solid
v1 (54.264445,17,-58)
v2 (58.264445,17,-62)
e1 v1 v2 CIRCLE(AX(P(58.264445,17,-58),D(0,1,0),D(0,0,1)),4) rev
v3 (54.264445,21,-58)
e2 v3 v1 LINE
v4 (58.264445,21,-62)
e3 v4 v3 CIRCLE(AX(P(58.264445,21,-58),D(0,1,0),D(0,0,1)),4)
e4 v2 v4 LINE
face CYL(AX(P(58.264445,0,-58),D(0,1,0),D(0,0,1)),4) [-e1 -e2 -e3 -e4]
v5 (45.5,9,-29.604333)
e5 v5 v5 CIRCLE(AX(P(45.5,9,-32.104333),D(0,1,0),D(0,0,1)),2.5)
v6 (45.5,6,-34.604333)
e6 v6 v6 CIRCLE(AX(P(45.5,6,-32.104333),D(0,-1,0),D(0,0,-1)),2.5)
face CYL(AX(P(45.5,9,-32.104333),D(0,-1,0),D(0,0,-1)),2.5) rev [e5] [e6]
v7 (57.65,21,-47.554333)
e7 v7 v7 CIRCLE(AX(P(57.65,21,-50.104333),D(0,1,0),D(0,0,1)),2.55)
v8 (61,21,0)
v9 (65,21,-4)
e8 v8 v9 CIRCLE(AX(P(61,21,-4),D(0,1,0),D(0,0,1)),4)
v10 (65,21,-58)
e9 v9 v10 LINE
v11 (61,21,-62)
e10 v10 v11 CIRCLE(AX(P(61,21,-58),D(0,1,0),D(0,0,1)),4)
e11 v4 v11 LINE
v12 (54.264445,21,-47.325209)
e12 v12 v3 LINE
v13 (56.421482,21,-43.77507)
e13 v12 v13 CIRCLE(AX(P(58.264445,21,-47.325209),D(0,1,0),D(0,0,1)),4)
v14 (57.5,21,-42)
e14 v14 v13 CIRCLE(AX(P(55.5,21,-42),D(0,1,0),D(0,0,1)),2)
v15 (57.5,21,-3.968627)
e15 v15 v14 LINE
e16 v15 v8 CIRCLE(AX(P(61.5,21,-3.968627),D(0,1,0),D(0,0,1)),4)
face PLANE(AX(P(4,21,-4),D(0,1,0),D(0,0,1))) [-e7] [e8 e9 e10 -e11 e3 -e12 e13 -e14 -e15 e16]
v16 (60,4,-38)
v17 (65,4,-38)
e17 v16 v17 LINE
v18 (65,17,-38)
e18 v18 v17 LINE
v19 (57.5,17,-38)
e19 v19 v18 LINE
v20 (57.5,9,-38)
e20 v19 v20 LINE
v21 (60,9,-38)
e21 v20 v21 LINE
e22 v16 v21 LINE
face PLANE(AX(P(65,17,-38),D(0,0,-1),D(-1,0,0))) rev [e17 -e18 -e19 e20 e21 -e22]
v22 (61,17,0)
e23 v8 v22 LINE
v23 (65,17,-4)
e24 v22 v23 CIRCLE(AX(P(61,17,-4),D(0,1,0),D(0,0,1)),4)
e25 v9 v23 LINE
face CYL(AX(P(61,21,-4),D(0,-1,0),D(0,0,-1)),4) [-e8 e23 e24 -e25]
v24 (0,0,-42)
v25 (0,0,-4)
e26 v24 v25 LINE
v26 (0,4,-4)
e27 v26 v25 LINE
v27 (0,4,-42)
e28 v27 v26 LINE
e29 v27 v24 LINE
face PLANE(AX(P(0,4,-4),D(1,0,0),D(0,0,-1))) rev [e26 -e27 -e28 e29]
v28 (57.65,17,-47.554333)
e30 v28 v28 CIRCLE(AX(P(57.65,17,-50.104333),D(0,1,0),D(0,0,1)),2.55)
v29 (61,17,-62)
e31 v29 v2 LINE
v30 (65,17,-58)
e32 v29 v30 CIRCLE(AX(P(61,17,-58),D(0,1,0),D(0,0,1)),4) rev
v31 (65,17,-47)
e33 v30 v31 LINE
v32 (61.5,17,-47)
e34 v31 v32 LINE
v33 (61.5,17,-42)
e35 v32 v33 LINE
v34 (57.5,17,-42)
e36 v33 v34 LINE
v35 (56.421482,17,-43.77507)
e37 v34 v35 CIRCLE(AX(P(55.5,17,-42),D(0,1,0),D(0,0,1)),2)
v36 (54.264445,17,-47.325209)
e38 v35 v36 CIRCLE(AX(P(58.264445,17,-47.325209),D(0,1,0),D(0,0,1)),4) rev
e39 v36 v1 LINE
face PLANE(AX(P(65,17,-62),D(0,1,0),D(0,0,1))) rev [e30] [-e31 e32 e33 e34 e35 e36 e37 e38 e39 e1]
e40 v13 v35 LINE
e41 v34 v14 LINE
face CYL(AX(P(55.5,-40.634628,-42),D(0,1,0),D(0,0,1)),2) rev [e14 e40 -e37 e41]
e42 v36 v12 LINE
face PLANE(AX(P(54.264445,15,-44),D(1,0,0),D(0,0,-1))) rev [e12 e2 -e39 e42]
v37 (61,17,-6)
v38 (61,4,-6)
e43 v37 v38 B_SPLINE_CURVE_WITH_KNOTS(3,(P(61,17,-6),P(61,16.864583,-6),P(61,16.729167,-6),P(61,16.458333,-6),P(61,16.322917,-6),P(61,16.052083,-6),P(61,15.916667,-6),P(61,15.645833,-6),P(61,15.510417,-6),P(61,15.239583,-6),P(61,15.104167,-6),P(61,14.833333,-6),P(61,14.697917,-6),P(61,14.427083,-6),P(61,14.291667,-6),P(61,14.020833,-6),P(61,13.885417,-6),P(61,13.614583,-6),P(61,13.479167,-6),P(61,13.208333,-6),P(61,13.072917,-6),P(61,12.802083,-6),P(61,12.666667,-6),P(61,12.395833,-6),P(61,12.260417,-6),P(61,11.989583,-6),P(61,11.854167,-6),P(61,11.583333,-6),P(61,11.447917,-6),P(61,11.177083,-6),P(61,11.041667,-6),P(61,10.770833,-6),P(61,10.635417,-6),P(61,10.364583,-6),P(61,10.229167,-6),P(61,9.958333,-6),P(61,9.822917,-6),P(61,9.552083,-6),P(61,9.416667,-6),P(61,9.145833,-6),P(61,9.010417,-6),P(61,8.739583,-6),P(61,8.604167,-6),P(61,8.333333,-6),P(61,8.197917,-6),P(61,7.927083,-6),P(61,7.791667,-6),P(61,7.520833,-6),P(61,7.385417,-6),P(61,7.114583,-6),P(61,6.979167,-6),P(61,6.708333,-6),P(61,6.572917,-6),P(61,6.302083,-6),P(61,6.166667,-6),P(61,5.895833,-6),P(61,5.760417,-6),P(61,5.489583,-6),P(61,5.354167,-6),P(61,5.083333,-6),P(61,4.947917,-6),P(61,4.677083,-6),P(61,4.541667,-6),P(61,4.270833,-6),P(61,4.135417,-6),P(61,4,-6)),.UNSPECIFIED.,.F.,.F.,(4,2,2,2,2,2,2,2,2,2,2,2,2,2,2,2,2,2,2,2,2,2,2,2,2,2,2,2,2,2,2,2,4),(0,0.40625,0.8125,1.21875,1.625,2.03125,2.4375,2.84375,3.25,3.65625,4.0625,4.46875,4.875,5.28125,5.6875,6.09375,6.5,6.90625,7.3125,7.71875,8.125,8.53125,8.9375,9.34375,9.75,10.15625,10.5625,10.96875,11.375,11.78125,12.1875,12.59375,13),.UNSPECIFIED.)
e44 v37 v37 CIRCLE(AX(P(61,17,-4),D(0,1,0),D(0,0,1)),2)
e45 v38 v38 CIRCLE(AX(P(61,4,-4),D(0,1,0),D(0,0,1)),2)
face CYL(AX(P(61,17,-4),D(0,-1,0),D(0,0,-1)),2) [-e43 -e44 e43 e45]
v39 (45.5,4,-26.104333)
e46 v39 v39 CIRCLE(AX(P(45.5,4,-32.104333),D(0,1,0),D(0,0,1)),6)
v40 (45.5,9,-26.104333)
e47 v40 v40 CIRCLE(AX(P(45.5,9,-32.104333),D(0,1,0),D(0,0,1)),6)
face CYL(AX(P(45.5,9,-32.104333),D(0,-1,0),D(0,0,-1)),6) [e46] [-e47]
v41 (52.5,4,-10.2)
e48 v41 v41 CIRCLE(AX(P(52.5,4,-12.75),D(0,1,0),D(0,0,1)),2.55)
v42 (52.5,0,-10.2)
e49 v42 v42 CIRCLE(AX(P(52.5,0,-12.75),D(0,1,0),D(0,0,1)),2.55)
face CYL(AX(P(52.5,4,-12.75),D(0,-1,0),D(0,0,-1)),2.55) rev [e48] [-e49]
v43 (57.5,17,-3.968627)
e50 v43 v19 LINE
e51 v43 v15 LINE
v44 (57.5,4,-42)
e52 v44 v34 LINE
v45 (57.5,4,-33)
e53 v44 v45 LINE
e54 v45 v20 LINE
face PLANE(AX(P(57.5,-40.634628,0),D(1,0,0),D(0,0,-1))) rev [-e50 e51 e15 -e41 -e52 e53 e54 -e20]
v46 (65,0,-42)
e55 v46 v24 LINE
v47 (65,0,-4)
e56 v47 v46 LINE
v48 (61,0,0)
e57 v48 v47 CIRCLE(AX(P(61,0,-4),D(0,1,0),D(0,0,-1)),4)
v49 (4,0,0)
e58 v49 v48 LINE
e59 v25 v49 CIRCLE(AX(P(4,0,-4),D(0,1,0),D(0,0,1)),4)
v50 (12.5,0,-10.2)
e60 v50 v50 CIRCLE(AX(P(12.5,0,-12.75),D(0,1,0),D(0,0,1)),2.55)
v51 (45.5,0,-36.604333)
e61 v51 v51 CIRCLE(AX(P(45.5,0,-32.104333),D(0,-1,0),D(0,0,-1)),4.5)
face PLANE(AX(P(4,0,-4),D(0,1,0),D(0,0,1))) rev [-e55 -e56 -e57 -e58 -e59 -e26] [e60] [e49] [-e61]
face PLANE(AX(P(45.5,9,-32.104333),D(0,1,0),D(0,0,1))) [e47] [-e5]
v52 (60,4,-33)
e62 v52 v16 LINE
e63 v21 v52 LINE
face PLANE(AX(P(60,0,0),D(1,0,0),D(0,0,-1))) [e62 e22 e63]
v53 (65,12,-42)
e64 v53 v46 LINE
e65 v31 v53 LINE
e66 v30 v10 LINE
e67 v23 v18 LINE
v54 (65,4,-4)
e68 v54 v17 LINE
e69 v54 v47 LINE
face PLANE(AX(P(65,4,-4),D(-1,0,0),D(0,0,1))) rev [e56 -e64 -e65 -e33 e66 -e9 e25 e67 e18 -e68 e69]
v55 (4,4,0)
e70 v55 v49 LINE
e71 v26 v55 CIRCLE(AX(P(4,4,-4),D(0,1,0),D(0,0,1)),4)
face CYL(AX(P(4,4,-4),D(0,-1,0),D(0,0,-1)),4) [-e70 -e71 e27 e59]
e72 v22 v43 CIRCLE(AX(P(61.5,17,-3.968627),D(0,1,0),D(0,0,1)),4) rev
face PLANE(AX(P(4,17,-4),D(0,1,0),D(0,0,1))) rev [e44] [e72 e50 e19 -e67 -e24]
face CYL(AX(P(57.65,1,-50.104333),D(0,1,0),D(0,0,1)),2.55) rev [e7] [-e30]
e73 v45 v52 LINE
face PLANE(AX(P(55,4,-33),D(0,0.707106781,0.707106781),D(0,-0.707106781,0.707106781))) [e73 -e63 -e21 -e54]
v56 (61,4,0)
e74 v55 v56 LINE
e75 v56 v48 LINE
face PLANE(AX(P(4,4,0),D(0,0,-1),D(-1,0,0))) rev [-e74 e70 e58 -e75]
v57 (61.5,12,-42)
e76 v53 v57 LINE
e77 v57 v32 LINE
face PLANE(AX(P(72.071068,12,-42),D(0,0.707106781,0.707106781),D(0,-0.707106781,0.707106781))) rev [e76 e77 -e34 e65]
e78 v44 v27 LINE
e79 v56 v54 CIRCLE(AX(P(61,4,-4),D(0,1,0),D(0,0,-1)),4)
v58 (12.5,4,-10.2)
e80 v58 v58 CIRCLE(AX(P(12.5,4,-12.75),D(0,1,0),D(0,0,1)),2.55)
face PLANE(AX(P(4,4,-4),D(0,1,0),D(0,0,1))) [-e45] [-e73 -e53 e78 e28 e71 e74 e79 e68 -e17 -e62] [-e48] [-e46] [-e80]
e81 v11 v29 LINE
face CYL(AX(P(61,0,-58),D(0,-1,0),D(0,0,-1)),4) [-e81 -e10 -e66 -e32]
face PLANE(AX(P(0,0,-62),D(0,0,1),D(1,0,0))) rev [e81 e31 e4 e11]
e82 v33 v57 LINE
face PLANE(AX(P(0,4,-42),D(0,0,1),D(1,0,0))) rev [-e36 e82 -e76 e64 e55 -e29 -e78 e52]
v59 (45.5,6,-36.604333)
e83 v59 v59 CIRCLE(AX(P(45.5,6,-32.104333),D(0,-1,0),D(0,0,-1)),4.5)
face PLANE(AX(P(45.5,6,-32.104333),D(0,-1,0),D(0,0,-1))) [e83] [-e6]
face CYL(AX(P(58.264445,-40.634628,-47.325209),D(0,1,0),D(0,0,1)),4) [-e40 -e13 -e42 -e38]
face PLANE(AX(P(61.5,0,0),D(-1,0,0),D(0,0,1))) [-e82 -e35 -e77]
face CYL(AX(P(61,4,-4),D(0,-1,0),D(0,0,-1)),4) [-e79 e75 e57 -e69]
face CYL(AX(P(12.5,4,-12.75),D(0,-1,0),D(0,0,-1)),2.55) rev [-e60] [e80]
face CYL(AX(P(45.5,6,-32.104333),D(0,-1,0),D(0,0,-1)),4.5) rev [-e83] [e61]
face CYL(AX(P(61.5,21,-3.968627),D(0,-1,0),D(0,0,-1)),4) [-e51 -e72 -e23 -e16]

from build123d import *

# Parameters (mm, degrees)
SKETCH1_R                = 2.55
BOSS_EXTRUDE1_DEPTH      = 4
SKETCH2_R                = 2
SKETCH2_W                = 65
SKETCH2_H                = 4
BOSS_EXTRUDE2_DEPTH      = 13
BOSS_EXTRUDE3_DEPTH      = 4
SKETCH4_W                = 65
SKETCH4_H                = 4
BOSS_EXTRUDE4_DEPTH      = 20
FILLET1_R                = 4
SKETCH6_R                = 2.55
CUT_EXTRUDE1_DEPTH       = 20
SKETCH7_W                = 46
SKETCH7_H                = 4
CUT_EXTRUDE2_DEPTH       = 80
BOSS_EXTRUDE6_DEPTH      = 2.5
BOSS_EXTRUDE6_DEPTH_BACK = 2.5
CUT_EXTRUDE3_REACH       = 94.25
FILLET2_R                = 4
SKETCH8_R                = 6
SKETCH8_R_2              = 2.5
BOSS_EXTRUDE5_DEPTH      = 5
FILLET3_R                = 4
BOSS_EXTRUDE7_START      = 4
BOSS_EXTRUDE7_DEPTH      = 3.5
SKETCH13_R               = 4.5
CUT_EXTRUDE4_DEPTH       = 6
SKETCH14_W               = 13.282344927
SKETCH14_H               = 18
CUT_EXTRUDE5_DEPTH       = 6
FILLET5_R                = 4


with BuildPart() as part:
    # Sketch1 → Boss-Extrude1 (new body)
    with BuildSketch(Plane(origin=(0, 0, 0), x_dir=(1, 0, 0), z_dir=(0, 1, 0))):
        with BuildLine():
            Line((4, 0), (61, 0))
            ThreePointArc((61, 0), (63.828427125, 1.171572875), (65, 4))
            Line((65, 4), (65, 42))
            Line((65, 42), (0, 42))
            Line((0, 42), (0, 4))
            ThreePointArc((0, 4), (1.171572875, 1.171572875), (4, 0))
        make_face()
        with Locations(Location((12.5, 12.75, 0), (0, 0, 270))):
            Circle(SKETCH1_R, mode=Mode.SUBTRACT)
        with Locations(Location((52.5, 12.75, 0), (0, 0, 270))):
            Circle(SKETCH1_R, mode=Mode.SUBTRACT)
    extrude(amount=BOSS_EXTRUDE1_DEPTH)

    # Sketch2 → Boss-Extrude2 (add)
    with BuildSketch(Plane(origin=(0, 4, 0), x_dir=(1, 0, 0), z_dir=(0, 1, 0))):
        with Locations(Location((61, 4, 0), (0, 0, 90))):
            Circle(SKETCH2_R)
        with Locations(Location((4, 4, 0), (0, 0, 90))):
            Circle(SKETCH2_R)
        with Locations((32.5, 40)):
            Rectangle(SKETCH2_W, SKETCH2_H)
    extrude(amount=BOSS_EXTRUDE2_DEPTH)

    # Sketch3 → Boss-Extrude3 (add)
    with BuildSketch(Plane(origin=(0, 17, 0), x_dir=(1, 0, 0), z_dir=(0, 1, 0))):
        with BuildLine():
            Line((0, 42), (65, 42))
            Line((65, 42), (65, 4))
            ThreePointArc((65, 4), (63.828427125, 1.171572875), (61, 0))
            Line((61, 0), (4, 0))
            ThreePointArc((4, 0), (1.171572875, 1.171572875), (0, 4))
            Line((0, 4), (0, 42))
        make_face()
    extrude(amount=BOSS_EXTRUDE3_DEPTH)

    # Sketch4 → Boss-Extrude4 (add)
    with BuildSketch(Plane(origin=(0, 0, -42), x_dir=(-1, 0, 0), z_dir=(0, 0, -1))):
        with Locations((-32.5, 19)):
            Rectangle(SKETCH4_W, SKETCH4_H)
    extrude(amount=BOSS_EXTRUDE4_DEPTH)

    # Fillet1
    fillet1_edges = [part.edges().sort_by_distance(p)[0] for p in [
        (65, 19, -62),
        (0, 19, -62),
    ]]
    fillet(fillet1_edges, radius=FILLET1_R)

    # Sketch6 → Cut-Extrude1 (cut)
    with BuildSketch(Plane(origin=(0, 21, 0), x_dir=(1, 0, 0), z_dir=(0, 1, 0))):
        with Locations(Location((57.65, 50.10433299, 0), (0, 0, 270))):
            Circle(SKETCH6_R)
        with Locations(Location((45.5, 32.10433299, 0), (0, 0, 270))):
            Circle(SKETCH6_R)
    extrude(amount=-CUT_EXTRUDE1_DEPTH, mode=Mode.SUBTRACT)

    # Sketch7 → Cut-Extrude2 (cut)
    with BuildSketch(Plane.XY):
        Polygon((4, 17), (4, 21), (0, 21), (0, 4), (50, 4), (50, 17), align=None)
        with Locations((27, 19)):
            Rectangle(SKETCH7_W, SKETCH7_H)
    extrude(amount=-CUT_EXTRUDE2_DEPTH, mode=Mode.SUBTRACT)

    # Sketch10 → Boss-Extrude6 (add, two sides: drawn at the far end of the back side and taken through both)
    with BuildSketch(Plane(origin=(57.5, 0, 0), x_dir=(0, 0, -1), z_dir=(1, 0, 0)).offset(-BOSS_EXTRUDE6_DEPTH_BACK)):
        Polygon((33, 4), (38, 9), (38, 4), align=None)
    extrude(amount=BOSS_EXTRUDE6_DEPTH + BOSS_EXTRUDE6_DEPTH_BACK)

    # Cut-Extrude3: up to this face of the body (flat: up to its plane)
    cut_extrude3_end = Plane(part.part.faces().sort_by_distance((31.428078694, 4, -20.594205602))[0])
    # Sketch11 → Cut-Extrude3 (cut, up to the picked face)
    with BuildSketch(Plane(origin=(0, 21, 0), x_dir=(1, 0, 0), z_dir=(0, 1, 0)), mode=Mode.PRIVATE) as cut_extrude3_sk1:
        with BuildLine():
            Line((57.5, 0), (57.5, 42))
            ThreePointArc((57.5, 42), (56.914213562, 43.414213562), (55.5, 44))
            Line((55.5, 44), (50, 44))
            Line((50, 44), (50, 0))
            Line((50, 0), (57.5, 0))
        make_face()
    cut_extrude3_tool1 = split(extrude(cut_extrude3_sk1.sketch, amount=-CUT_EXTRUDE3_REACH, mode=Mode.PRIVATE), bisect_by=cut_extrude3_end, keep=Keep.BOTH, mode=Mode.PRIVATE)
    add(cut_extrude3_tool1.solids().sort_by(Axis((53.741385, 21, -21.943789), (0, -1, 0)))[0], mode=Mode.SUBTRACT)

    # Fillet2
    # the kernel refuses this fillet: 4 mm, written as the material it takes off along each edge
    with BuildSketch(Plane(origin=(57.5, 30.921567416, 0), x_dir=(1, 0, 0), z_dir=(0, -1, 0))) as fillet2_piece_1:
        with BuildLine():
            CenterArc((4, -3.968626967), FILLET2_R, 97.180755781, 82.819244219)
            Line((0, -3.968626967), (-0.08, -3.968626967))
            Line((-0.08, -3.968626967), (-0.08, 0))
            Line((-0.08, 0), (0, 0.08))
            ThreePointArc((0, 0.08), (1.75, 0.08), (3.49, 0.079372539))
            Line((3.49, 0.079372539), (3.5, 0))
        make_face()
    extrude(amount=23.843134833, mode=Mode.SUBTRACT)

    # Sketch8 → Boss-Extrude5 (add)
    with BuildSketch(Plane(origin=(0, 4, 0), x_dir=(1, 0, 0), z_dir=(0, 1, 0))):
        with Locations(Location((45.5, 32.10433299, 0), (0, 0, 270))):
            Circle(SKETCH8_R)
        with Locations(Location((45.5, 32.10433299, 0), (0, 0, 270))):
            Circle(SKETCH8_R_2, mode=Mode.SUBTRACT)
    extrude(amount=BOSS_EXTRUDE5_DEPTH)

    # Fillet3
    fillet3_edges = [part.edges().sort_by_distance(p)[0] for p in [
        (50, 19, -62),
    ]]
    fillet(fillet3_edges, radius=FILLET3_R)

    # Sketch12 → Boss-Extrude7 (add)
    with BuildSketch(Plane(origin=(57.5, 0, 0), x_dir=(0, 0, -1), z_dir=(1, 0, 0)).offset(BOSS_EXTRUDE7_START)):
        Polygon((42, 12), (47, 17), (42, 17), align=None)
    extrude(amount=BOSS_EXTRUDE7_DEPTH)

    # Sketch13 → Cut-Extrude4 (cut)
    with BuildSketch(Plane.XZ):
        with Locations(Location((45.5, -32.10433299, 0), (0, 0, 270))):
            Circle(SKETCH13_R)
    extrude(amount=-CUT_EXTRUDE4_DEPTH, mode=Mode.SUBTRACT)

    # Sketch14 → Cut-Extrude5 (cut)
    with BuildSketch(Plane(origin=(0, 21, 0), x_dir=(1, 0, 0), z_dir=(0, 1, 0))):
        with Locations((47.623272126, 53)):
            Rectangle(SKETCH14_W, SKETCH14_H)
    extrude(amount=-CUT_EXTRUDE5_DEPTH, mode=Mode.SUBTRACT)

    # Fillet5
    fillet5_edges = [part.edges().sort_by_distance(p)[0] for p in [
        (54.264444589, 19, -62),
        (54.264444589, 19, -44),
    ]]
    fillet(fillet5_edges, radius=FILLET5_R)


solid = part.part
